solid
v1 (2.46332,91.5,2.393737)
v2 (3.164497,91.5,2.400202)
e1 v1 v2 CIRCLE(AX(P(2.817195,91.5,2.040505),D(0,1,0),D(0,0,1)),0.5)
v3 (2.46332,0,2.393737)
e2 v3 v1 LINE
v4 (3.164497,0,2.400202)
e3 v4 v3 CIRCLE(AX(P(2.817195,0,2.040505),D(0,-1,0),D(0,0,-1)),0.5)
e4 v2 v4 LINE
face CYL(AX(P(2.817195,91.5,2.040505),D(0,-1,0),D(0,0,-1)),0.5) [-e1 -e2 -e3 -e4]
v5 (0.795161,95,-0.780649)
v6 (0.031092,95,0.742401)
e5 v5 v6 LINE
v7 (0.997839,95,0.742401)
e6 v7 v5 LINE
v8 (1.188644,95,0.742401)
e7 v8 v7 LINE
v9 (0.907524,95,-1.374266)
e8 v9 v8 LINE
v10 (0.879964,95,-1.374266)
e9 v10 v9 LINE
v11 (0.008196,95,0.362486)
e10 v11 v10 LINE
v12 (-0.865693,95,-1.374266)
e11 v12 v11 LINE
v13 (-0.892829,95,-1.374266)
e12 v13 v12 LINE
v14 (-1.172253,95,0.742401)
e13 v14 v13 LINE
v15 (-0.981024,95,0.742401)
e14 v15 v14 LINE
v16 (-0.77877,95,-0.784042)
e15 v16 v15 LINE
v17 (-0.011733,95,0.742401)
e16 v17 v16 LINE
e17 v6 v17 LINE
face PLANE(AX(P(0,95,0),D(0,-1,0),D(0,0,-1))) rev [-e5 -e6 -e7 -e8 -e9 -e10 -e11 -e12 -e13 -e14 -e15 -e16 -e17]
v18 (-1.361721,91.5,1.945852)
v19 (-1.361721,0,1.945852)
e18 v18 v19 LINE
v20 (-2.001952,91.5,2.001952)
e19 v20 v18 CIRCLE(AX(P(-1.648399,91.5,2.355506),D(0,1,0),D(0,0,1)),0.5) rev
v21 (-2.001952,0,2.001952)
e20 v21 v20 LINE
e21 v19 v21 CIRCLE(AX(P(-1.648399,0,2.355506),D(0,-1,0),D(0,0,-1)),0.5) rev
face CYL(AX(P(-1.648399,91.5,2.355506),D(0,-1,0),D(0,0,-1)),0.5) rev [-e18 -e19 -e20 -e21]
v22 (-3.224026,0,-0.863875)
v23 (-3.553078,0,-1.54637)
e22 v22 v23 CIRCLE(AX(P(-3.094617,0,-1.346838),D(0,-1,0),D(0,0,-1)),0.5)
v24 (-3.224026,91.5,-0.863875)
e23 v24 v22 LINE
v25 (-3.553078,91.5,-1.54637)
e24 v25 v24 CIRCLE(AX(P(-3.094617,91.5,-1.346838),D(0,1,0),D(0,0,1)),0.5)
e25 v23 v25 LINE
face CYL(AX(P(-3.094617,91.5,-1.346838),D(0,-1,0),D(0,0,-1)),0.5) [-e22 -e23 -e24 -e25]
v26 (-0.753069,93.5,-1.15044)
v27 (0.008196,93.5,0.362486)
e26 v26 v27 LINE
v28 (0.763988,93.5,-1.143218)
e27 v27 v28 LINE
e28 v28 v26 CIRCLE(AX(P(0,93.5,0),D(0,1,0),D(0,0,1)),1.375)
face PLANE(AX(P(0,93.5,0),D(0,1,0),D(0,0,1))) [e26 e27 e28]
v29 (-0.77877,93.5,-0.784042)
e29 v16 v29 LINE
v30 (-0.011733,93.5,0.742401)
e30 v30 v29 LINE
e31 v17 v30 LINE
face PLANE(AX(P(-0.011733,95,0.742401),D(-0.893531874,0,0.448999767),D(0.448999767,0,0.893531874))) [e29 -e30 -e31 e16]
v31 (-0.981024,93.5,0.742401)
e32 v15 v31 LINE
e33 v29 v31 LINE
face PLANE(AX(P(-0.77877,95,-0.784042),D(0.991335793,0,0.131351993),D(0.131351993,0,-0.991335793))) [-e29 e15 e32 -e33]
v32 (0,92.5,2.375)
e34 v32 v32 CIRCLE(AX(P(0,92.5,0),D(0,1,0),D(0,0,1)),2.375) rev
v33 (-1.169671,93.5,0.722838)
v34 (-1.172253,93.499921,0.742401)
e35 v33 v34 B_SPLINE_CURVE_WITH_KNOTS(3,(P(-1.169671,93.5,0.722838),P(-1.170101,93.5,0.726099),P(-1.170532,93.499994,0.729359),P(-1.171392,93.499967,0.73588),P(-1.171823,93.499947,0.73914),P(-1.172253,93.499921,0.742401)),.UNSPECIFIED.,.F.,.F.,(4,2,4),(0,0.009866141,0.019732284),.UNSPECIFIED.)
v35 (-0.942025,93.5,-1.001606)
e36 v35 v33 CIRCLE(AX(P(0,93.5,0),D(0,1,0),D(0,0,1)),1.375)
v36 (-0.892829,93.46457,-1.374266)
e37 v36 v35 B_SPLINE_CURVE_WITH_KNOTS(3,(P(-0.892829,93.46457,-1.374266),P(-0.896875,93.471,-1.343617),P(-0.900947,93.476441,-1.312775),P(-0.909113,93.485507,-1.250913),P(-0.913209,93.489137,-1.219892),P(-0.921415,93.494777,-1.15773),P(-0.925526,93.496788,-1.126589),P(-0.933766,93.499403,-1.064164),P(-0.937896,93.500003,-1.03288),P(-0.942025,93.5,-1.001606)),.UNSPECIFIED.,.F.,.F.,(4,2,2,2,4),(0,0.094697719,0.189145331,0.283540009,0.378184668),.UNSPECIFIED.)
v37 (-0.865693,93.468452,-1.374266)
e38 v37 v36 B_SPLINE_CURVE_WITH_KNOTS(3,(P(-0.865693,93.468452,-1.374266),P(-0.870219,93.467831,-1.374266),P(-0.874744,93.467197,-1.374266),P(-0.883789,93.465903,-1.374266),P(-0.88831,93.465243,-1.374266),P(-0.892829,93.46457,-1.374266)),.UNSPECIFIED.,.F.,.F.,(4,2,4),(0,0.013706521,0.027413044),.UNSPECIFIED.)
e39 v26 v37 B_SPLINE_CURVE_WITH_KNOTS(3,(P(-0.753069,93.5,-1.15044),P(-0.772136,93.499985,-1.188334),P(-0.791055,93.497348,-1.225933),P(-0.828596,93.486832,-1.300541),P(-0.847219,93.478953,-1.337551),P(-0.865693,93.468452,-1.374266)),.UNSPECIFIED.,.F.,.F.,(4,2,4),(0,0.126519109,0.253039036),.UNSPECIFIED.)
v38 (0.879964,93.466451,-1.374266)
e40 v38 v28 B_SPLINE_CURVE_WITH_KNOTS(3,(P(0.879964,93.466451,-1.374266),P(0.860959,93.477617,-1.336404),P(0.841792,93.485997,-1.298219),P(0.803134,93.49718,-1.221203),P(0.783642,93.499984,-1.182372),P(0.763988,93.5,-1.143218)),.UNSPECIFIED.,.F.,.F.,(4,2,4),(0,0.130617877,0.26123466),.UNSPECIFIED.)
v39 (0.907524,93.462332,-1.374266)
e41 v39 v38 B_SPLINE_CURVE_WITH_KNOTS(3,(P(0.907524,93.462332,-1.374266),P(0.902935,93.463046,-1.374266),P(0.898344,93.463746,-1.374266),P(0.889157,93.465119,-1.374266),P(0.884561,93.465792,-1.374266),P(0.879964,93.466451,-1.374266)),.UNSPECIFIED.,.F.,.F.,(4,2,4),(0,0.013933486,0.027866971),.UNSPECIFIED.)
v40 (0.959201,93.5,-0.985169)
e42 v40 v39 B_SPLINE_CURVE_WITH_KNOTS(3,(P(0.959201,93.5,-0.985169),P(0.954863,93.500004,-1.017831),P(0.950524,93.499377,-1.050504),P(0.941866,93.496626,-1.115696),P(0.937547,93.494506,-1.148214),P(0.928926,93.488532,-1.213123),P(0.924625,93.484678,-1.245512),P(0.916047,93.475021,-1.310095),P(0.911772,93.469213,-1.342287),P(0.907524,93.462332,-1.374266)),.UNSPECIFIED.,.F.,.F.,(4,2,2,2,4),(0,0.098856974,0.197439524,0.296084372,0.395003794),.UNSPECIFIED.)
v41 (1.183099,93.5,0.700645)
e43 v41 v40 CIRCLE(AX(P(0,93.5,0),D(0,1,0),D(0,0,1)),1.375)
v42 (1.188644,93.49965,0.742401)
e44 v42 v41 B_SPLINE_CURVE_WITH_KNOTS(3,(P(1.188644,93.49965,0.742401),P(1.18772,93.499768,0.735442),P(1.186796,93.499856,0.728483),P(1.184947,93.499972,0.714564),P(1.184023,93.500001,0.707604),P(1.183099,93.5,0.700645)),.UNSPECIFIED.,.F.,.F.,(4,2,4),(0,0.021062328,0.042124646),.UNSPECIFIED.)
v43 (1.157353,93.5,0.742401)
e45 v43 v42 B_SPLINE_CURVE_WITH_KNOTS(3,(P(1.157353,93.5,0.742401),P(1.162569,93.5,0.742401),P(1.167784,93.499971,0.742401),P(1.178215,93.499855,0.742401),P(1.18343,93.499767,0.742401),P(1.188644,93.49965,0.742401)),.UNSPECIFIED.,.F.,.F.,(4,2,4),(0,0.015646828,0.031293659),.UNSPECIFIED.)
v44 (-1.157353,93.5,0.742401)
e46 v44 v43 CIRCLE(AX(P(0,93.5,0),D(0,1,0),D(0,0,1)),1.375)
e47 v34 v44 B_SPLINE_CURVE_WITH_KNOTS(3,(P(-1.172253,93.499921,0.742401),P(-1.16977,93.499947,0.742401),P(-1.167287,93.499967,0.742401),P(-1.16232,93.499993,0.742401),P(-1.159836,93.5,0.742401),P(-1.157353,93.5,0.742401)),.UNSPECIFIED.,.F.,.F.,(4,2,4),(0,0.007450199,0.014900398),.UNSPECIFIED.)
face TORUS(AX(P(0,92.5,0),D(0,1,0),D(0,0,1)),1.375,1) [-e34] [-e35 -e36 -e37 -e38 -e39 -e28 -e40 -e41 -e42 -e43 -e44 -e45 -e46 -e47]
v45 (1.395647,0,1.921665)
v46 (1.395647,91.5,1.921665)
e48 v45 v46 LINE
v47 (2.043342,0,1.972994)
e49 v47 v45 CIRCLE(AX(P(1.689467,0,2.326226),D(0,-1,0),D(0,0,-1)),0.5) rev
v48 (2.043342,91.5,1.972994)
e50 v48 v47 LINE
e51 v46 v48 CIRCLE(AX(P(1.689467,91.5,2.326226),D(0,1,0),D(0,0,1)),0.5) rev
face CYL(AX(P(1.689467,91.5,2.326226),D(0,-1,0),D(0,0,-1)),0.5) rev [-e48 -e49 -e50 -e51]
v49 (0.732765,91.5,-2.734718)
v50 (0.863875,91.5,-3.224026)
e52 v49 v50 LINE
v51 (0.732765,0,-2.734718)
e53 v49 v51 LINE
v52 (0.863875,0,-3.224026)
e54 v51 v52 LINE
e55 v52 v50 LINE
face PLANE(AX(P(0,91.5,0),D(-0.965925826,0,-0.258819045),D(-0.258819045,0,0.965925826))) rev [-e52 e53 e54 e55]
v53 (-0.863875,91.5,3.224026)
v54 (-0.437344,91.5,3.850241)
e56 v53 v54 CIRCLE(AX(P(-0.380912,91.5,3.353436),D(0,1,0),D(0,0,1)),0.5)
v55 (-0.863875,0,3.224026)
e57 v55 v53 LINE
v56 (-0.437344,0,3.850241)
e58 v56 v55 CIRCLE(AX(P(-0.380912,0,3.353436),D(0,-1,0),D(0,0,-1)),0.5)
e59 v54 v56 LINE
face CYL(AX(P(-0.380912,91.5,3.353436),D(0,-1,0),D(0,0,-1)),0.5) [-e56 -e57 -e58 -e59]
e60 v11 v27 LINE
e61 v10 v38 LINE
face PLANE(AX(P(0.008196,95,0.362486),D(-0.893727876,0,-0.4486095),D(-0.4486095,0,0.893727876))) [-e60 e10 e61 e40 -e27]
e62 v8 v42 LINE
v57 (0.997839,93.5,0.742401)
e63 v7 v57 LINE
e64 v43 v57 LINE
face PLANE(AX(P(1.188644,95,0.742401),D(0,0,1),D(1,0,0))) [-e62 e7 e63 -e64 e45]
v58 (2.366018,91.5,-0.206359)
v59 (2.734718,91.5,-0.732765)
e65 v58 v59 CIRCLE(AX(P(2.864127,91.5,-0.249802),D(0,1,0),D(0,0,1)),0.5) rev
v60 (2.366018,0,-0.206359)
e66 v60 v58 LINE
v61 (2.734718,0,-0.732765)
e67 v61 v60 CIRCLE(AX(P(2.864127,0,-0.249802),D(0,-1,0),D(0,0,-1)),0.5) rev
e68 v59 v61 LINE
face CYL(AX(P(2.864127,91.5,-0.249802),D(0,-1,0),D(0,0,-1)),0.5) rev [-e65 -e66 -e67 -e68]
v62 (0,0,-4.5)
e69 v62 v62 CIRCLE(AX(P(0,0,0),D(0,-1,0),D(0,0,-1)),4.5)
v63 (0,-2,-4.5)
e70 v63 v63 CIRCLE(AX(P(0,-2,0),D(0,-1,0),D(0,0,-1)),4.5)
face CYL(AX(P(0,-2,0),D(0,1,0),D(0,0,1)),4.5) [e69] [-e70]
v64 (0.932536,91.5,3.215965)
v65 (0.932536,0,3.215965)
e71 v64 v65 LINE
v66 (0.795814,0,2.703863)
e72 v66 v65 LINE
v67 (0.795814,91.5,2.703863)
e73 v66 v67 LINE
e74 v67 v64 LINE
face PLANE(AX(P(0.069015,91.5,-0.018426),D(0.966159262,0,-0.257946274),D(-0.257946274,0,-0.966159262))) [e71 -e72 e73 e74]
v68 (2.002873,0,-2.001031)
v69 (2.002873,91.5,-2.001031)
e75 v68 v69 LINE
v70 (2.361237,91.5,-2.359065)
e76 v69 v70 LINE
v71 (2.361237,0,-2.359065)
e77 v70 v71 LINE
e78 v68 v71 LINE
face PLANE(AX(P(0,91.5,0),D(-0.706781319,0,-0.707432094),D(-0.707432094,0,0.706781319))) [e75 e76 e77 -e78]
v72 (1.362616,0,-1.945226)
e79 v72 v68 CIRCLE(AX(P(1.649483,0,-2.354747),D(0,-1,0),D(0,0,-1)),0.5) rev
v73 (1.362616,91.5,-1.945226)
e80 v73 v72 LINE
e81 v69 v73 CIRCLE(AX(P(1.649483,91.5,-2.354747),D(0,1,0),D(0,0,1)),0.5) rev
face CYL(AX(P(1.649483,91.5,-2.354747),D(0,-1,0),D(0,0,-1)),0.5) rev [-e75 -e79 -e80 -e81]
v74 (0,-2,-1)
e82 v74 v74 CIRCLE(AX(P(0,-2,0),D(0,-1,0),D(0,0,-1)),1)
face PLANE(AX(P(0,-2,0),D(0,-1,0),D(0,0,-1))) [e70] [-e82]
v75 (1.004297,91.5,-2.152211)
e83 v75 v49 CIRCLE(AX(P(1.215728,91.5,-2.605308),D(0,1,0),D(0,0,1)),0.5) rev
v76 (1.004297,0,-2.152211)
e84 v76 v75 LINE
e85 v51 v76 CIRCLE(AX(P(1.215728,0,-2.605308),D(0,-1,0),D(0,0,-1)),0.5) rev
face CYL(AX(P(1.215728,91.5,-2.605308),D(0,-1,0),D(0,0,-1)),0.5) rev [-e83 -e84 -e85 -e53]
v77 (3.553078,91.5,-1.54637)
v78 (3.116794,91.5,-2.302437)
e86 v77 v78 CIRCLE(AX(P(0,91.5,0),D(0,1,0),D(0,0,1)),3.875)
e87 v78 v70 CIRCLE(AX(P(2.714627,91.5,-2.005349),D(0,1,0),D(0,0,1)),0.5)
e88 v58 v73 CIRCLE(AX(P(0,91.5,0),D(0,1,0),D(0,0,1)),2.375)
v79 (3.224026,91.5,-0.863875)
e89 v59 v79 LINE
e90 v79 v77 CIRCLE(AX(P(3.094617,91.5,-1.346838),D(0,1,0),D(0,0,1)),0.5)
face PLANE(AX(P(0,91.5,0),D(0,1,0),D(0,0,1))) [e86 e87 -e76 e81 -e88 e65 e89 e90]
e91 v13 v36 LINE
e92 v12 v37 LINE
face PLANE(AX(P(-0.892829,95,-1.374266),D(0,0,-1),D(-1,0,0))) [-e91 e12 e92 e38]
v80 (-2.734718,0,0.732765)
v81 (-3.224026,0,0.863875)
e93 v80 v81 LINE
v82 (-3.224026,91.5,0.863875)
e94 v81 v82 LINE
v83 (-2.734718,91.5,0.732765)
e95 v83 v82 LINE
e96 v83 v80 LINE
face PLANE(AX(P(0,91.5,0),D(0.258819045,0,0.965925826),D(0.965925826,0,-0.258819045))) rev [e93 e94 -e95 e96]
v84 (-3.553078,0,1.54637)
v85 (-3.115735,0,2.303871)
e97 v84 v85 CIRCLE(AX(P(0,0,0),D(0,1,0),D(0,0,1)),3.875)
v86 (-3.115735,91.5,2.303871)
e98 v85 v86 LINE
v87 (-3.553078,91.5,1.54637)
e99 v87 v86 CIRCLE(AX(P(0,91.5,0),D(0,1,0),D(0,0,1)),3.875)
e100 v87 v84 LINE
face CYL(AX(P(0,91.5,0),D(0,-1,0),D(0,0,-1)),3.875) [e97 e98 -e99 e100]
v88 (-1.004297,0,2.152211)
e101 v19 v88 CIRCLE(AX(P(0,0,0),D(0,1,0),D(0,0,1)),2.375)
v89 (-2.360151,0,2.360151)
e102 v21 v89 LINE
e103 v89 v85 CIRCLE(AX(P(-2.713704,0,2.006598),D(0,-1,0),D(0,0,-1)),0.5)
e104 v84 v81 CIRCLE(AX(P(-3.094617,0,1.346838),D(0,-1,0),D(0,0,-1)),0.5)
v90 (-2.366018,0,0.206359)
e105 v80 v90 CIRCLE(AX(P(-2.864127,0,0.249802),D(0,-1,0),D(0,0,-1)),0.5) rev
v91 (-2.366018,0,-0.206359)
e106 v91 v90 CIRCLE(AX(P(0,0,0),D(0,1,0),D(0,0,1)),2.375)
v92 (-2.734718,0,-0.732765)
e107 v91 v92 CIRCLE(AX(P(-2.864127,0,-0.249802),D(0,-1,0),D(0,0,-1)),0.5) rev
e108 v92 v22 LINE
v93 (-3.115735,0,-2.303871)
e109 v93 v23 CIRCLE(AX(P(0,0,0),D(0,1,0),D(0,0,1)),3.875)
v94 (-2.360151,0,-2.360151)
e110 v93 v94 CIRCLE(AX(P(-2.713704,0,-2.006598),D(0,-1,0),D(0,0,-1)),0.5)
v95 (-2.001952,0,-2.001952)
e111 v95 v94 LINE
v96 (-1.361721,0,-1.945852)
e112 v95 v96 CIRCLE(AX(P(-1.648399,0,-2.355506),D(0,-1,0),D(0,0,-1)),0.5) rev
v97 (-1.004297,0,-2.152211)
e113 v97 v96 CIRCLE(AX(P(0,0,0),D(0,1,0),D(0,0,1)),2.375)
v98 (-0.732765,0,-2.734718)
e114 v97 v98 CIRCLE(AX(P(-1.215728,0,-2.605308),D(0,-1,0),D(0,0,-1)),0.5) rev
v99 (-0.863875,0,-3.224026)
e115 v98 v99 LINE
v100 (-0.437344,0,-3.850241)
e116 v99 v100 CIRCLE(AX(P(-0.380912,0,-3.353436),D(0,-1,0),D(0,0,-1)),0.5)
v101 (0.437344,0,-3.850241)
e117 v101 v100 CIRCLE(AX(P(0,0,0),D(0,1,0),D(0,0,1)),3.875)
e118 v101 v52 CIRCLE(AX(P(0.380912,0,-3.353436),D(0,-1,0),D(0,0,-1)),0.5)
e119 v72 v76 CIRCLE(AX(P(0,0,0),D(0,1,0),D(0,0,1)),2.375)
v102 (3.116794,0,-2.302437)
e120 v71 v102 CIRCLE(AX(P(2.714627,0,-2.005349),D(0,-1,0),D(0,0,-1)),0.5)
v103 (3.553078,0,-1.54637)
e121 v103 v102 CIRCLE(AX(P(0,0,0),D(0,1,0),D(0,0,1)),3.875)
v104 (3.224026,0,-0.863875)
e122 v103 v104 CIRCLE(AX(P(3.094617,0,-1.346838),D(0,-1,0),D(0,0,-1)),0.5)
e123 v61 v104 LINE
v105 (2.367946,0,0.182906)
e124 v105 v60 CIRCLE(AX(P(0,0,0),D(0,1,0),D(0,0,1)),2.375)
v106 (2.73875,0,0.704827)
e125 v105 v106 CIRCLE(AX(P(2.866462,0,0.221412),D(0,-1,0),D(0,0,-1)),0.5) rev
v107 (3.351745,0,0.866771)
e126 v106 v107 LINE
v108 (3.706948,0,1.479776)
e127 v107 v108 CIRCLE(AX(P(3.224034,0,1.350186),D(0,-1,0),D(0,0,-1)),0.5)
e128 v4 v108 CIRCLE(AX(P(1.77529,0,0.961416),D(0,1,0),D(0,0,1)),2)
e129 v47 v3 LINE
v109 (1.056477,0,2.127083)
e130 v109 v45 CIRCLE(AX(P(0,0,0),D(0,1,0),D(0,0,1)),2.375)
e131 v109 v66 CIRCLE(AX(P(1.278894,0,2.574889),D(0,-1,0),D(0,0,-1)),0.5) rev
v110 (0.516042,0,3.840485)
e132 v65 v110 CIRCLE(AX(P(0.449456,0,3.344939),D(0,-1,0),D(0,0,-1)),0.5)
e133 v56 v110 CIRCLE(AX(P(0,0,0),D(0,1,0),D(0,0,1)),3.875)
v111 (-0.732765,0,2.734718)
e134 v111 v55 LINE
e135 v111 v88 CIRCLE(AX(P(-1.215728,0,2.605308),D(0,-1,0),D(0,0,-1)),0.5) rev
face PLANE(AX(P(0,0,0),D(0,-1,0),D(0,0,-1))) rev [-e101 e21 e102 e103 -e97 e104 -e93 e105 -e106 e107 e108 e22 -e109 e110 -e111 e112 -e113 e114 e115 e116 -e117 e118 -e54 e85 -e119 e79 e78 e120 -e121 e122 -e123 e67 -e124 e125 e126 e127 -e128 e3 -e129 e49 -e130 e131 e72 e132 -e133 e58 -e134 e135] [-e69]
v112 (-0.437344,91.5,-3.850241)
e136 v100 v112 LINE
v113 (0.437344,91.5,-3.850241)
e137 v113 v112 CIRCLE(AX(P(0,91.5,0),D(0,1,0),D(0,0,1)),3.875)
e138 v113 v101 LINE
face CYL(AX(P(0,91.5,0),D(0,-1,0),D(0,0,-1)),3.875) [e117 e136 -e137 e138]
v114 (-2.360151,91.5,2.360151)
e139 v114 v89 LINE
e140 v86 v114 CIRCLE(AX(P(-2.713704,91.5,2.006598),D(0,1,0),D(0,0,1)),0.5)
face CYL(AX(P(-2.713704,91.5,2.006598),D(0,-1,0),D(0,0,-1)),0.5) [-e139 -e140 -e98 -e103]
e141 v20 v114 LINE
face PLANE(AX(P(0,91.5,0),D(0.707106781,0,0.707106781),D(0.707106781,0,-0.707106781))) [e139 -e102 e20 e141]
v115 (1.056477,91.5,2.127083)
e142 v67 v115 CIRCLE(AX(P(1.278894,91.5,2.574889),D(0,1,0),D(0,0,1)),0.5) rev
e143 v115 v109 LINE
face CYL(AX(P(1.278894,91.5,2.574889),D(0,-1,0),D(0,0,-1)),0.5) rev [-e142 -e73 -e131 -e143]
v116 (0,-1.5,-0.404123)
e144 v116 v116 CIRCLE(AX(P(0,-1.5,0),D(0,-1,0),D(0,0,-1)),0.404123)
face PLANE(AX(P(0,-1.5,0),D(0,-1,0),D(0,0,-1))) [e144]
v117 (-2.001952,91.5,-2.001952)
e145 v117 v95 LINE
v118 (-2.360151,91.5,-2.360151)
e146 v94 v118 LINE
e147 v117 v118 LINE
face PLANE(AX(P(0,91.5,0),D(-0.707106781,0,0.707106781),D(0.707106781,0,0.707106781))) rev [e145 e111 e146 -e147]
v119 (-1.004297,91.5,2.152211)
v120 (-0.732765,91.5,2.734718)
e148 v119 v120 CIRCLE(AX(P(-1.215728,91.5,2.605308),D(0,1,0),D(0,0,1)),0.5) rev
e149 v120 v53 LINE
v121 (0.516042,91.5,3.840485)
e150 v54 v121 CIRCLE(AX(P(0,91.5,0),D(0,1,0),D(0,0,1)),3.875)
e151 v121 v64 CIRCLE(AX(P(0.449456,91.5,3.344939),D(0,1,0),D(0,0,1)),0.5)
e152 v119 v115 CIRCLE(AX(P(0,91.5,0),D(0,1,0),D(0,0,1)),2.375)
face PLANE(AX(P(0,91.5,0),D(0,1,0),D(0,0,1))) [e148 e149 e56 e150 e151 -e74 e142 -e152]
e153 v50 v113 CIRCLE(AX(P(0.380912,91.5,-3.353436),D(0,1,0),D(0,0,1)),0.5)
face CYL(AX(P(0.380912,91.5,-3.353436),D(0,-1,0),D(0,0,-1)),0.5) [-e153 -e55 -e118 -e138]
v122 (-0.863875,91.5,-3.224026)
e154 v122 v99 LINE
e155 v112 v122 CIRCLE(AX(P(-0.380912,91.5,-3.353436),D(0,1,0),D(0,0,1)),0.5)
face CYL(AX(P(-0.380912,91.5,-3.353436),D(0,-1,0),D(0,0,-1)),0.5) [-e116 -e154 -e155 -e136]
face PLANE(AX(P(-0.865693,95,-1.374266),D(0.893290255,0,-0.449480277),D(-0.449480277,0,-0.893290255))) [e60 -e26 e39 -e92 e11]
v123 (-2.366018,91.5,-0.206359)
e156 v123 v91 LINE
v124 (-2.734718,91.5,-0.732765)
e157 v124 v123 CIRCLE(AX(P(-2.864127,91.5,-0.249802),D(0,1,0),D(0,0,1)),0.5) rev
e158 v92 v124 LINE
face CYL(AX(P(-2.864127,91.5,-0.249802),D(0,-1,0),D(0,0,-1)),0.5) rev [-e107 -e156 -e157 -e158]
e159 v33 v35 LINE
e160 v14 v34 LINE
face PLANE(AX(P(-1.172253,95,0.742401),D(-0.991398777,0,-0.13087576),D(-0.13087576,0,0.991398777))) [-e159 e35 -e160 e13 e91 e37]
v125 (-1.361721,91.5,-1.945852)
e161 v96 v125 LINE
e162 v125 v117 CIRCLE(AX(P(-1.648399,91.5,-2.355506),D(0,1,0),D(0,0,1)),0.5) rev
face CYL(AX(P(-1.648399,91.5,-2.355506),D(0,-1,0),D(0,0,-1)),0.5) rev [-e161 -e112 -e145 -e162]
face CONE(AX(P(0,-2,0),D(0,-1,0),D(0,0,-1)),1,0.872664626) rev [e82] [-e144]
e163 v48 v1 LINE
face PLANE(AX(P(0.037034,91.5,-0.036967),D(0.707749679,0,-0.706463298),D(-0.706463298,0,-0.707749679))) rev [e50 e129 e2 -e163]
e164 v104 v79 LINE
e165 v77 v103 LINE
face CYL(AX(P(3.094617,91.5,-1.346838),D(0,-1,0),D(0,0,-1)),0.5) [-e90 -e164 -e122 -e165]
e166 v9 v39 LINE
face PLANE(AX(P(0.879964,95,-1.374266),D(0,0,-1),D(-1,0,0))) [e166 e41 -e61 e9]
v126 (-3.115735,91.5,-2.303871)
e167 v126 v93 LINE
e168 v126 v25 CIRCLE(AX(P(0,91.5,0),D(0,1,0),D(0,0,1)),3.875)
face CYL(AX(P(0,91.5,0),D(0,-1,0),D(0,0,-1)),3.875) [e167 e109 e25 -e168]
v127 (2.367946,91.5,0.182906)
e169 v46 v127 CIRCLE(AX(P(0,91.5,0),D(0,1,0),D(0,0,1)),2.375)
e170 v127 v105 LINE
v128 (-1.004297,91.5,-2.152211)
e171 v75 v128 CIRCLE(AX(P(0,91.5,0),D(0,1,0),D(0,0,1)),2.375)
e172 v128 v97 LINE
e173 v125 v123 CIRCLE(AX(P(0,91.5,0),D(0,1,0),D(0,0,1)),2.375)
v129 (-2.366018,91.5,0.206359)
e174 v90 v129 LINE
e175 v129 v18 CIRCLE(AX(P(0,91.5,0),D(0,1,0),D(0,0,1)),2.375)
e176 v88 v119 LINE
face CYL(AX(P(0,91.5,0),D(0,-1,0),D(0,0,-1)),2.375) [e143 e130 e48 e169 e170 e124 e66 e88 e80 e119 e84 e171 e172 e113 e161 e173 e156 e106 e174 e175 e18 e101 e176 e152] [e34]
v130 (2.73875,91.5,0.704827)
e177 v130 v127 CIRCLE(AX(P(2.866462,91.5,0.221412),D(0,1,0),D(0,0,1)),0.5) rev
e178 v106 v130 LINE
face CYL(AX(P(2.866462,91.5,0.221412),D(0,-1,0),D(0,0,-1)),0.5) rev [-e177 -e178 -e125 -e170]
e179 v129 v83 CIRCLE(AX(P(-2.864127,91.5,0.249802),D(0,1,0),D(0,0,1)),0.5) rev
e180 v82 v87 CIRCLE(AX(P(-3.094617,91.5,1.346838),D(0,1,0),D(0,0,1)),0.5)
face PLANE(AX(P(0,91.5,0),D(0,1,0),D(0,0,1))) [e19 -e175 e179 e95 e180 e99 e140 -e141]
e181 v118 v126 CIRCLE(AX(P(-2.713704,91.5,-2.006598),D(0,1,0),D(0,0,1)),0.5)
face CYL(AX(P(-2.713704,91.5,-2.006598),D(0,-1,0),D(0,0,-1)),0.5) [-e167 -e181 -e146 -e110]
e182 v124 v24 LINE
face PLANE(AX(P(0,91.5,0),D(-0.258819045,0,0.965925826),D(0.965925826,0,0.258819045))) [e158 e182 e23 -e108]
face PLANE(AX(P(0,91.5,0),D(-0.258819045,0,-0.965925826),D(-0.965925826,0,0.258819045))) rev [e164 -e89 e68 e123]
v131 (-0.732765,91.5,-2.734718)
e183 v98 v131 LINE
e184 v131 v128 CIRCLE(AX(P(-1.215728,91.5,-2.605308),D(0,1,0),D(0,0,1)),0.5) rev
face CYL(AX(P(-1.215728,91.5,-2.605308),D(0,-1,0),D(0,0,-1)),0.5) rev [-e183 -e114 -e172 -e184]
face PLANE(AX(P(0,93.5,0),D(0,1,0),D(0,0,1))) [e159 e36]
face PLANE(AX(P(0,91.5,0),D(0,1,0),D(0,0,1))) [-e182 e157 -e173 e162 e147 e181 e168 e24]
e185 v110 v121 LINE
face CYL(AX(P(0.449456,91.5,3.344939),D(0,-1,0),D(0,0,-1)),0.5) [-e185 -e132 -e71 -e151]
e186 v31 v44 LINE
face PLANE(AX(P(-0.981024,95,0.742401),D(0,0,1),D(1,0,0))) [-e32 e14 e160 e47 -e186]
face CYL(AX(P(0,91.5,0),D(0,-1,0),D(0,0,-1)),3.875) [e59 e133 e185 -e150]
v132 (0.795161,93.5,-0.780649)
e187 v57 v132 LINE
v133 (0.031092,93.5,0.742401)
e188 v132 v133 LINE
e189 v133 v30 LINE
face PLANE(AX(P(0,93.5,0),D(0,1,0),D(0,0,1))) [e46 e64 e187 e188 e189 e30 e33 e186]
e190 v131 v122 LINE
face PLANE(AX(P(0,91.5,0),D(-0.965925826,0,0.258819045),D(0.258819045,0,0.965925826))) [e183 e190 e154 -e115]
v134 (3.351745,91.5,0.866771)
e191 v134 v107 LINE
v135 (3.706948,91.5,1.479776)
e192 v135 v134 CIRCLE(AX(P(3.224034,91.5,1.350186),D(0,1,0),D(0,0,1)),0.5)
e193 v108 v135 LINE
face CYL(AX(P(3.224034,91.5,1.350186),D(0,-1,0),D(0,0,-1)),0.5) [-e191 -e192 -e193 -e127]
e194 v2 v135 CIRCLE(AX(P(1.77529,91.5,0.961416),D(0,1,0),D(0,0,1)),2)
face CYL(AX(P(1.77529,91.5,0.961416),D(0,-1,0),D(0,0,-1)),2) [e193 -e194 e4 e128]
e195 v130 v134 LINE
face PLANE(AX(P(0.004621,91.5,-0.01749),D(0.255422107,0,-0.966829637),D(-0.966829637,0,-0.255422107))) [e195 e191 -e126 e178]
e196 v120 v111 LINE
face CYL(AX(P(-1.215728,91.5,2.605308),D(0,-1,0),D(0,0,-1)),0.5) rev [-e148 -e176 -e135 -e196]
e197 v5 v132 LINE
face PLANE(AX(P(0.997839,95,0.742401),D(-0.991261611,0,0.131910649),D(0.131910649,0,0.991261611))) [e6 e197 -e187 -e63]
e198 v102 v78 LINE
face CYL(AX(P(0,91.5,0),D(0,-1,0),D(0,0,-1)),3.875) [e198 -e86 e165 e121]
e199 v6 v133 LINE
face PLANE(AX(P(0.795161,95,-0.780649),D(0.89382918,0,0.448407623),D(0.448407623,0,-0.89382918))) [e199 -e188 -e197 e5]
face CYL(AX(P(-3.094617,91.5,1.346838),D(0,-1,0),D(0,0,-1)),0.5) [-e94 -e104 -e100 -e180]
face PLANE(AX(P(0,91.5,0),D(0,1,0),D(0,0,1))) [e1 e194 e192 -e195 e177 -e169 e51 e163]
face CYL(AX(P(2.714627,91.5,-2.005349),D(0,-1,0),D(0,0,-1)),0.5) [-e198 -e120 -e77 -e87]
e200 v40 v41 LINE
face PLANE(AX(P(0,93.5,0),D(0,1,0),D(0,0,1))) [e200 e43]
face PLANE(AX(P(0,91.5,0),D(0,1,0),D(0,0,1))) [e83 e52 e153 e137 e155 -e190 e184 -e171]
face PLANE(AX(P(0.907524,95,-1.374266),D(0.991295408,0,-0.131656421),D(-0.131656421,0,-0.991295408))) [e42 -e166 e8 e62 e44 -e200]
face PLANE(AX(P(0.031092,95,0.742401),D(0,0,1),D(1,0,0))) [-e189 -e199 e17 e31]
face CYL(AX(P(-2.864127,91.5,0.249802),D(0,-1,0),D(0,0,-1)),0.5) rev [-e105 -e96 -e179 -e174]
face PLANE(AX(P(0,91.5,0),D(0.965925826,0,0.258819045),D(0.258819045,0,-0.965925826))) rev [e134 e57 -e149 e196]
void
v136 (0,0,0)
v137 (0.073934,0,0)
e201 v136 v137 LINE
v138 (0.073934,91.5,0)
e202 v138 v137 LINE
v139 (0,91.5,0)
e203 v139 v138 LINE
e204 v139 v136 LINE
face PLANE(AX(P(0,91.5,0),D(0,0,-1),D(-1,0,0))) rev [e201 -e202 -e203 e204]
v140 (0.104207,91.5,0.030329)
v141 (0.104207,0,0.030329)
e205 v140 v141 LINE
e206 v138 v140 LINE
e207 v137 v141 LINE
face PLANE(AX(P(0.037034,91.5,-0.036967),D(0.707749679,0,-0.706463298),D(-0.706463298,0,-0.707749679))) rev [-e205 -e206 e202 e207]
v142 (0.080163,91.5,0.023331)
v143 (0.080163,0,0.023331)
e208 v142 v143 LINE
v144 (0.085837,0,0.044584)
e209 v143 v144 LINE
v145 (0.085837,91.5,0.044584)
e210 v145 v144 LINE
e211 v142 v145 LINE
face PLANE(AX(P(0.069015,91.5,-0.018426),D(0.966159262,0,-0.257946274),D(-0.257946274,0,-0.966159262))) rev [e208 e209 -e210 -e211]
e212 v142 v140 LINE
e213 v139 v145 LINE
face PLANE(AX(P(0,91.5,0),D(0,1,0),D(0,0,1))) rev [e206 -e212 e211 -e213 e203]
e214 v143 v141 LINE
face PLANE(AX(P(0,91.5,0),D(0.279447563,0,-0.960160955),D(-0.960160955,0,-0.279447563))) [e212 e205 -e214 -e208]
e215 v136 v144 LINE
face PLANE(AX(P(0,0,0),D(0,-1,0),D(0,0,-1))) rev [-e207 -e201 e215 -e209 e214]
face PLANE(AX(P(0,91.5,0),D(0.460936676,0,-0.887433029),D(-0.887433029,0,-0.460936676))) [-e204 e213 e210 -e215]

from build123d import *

# Parameters (mm, degrees)
BOSS_EXTRUDE1_DEPTH = 91.5
SKETCH3_R           = 4.5
BOSS_EXTRUDE2_DEPTH = 2
SKETCH4_R           = 2.375
BOSS_EXTRUDE3_DEPTH = 2
FILLET1_R           = 0.5
SKETCH6_R           = 1
CUT_EXTRUDE4_DEPTH  = 0.5
CUT_EXTRUDE4_DRAFT  = -50
BOSS_EXTRUDE4_DEPTH = 1.5
FILLET2_R           = 1


with BuildPart() as part:
    # Sketch2 → Boss-Extrude1 (new body)
    with BuildSketch(Plane(origin=(0, 0, 0), x_dir=(1, 0, 0), z_dir=(0, 1, 0))):
        with BuildLine():
            Line((3.775215965, -0.978645895), (2.300774305, -0.58912019))
            ThreePointArc((2.300774305, -0.58912019), (2.374963211, 0.013219106), (2.294073837, 0.614695232))
            Line((2.294073837, 0.614695232), (3.742962577, 1.0029238))
            ThreePointArc((3.742962577, 1.0029238), (3.356294138, 1.936727823), (2.741299364, 2.73877761))
            Line((2.741299364, 2.73877761), (1.680151223, 1.678605632))
            ThreePointArc((1.680151223, 1.678605632), (1.187973207, 2.056537055), (0.614695232, 2.294073837))
            Line((0.614695232, 2.294073837), (1.0029238, 3.742962577))
            ThreePointArc((1.0029238, 3.742962577), (0, 3.875), (-1.0029238, 3.742962577))
            Line((-1.0029238, 3.742962577), (-0.614695232, 2.294073837))
            ThreePointArc((-0.614695232, 2.294073837), (-1.1875, 2.056810334), (-1.679378605, 1.679378605))
            Line((-1.679378605, 1.679378605), (-2.740038777, 2.740038777))
            ThreePointArc((-2.740038777, 2.740038777), (-3.35584844, 1.9375), (-3.742962577, 1.0029238))
            Line((-3.742962577, 1.0029238), (-2.294073837, 0.614695232))
            ThreePointArc((-2.294073837, 0.614695232), (-2.375, 0), (-2.294073837, -0.614695232))
            Line((-2.294073837, -0.614695232), (-3.742962577, -1.0029238))
            ThreePointArc((-3.742962577, -1.0029238), (-3.35584844, -1.9375), (-2.740038777, -2.740038777))
            Line((-2.740038777, -2.740038777), (-1.679378605, -1.679378605))
            ThreePointArc((-1.679378605, -1.679378605), (-1.1875, -2.056810334), (-0.614695232, -2.294073837))
            Line((-0.614695232, -2.294073837), (-1.0029238, -3.742962577))
            ThreePointArc((-1.0029238, -3.742962577), (0.033967076, -3.874851125), (1.068386506, -3.724805401))
            Line((1.068386506, -3.724805401), (0.681359786, -2.275164575))
            ThreePointArc((0.681359786, -2.275164575), (1.238849907, -2.026296106), (1.714477211, -1.643530618))
            Line((1.714477211, -1.643530618), (2.767163136, -2.698133353))
            ThreePointArc((2.767163136, -2.698133353), (3.500652231, -1.972912562), (3.775215965, -0.978645895))
        make_face()
        Polygon((0.085836926, -0.044584082), (0, 0), (0.073933818, 0), (0.104207494, -0.030328801), (0.080162685, -0.023330742), align=None, mode=Mode.SUBTRACT)
    extrude(amount=BOSS_EXTRUDE1_DEPTH)

    # Sketch3 → Boss-Extrude2 (add)
    with BuildSketch(Plane.XZ):
        with Locations(Location((0, 0, 0), (0, 0, 270))):
            Circle(SKETCH3_R)
    extrude(amount=BOSS_EXTRUDE2_DEPTH)

    # Sketch4 → Boss-Extrude3 (add)
    with BuildSketch(Plane(origin=(0, 91.5, 0), x_dir=(1, 0, 0), z_dir=(0, 1, 0))):
        with Locations(Location((0, 0, 0), (0, 0, 75))):
            Circle(SKETCH4_R)
    extrude(amount=BOSS_EXTRUDE3_DEPTH)

    # Fillet1
    # the kernel refuses this fillet: 0.5 mm, written as the material it adds along each edge
    with BuildSketch(Plane(origin=(-2.294073837, -1.140469783, 0.614695232), x_dir=(-0.965925826289068, 0, 0.2588190451025218), z_dir=(0, 1, 0)), Plane(origin=(-1.679378605, -1.140469783, -1.679378605), x_dir=(-0.7071067811865478, 0, -0.7071067811865474), z_dir=(0, 1, 0)), Plane(origin=(0.614695232, -1.140469783, -2.294073837), x_dir=(0.2588190451025215, 0, -0.9659258262890681), z_dir=(0, 1, 0)), Plane(origin=(2.294073837, -1.140469783, -0.614695232), x_dir=(0.9659258262890681, 0, -0.2588190451025215), z_dir=(0, 1, 0)), Plane(origin=(-0.614695232, -1.140469783, 2.294073837), x_dir=(-0.2588190451025215, 0, 0.9659258262890681), z_dir=(0, 1, 0))) as fillet1_piece_1:
        with BuildLine():
            CenterArc((0.456187913, -0.5), FILLET1_R, 90, 79.984589832)
            ThreePointArc((-0.036192593, -0.413043478), (-0.00906545, -0.20731306), (0, 0))
            Line((0, 0), (0.456187913, 0))
        make_face()
    extrude(amount=92.640469783)
    with BuildSketch(Plane(origin=(-2.294073837, -1.140469783, -0.614695232), x_dir=(-0.17351574004952178, 0, 0.9848310961556133), z_dir=(0, 1, 0)), Plane(origin=(-1.679378605, -1.140469783, 1.679378605), x_dir=(0.7661308776828862, 0, 0.6426845869171364), z_dir=(0, 1, 0))) as fillet1_piece_2:
        with BuildLine():
            CenterArc((0.458270974, -0.498091484), FILLET1_R, 95.007705084, 79.984589832)
            Line((-0.03982051, -0.45444663), (0, 0))
            ThreePointArc((0, 0), (0.20731306, -0.00906545), (0.414626119, 0))
        make_face()
    extrude(amount=92.640469783)
    with BuildSketch(Plane(origin=(-0.614695232, -1.140469783, -2.294073837), x_dir=(-0.258819045102522, 0, -0.965925826289068), z_dir=(0, 1, 0)), Plane(origin=(1.680151223, -1.140469783, -1.678605632), x_dir=(0.707432093873984, 0, -0.7067813187663288), z_dir=(0, 1, 0))) as fillet1_piece_3:
        with BuildLine():
            CenterArc((0.456187913, 0.5), FILLET1_R, 190.015410168, 79.984589832)
            ThreePointArc((-0.036192593, 0.413043478), (-0.00906545, 0.20731306), (0, 0))
            Line((0, 0), (0.456187913, 0))
        make_face()
    extrude(amount=92.640469783)
    with BuildSketch(Plane(origin=(2.300774305, -1.132506036, 0.58912019), x_dir=(0.16314582309469597, 0, -0.9866019665532569), z_dir=(0, 1, 0))) as fillet1_piece_4:
        with BuildLine():
            CenterArc((0.455070929, -0.498118095), FILLET1_R, 94.972648578, 79.61829146)
            Line((-0.042702606, -0.450985227), (0, 0))
            ThreePointArc((0, 0), (0.20586542, -0.008939048), (0.411730841, 0))
        make_face()
    extrude(amount=92.632506036)
    with BuildSketch(Plane(origin=(1.714477211, -1.163771178, 1.643530618), x_dir=(0.7064632978713467, 0, 0.7077496794494088), z_dir=(0, 1, 0))) as fillet1_piece_5:
        with BuildLine():
            CenterArc((0.465508471, -0.5), FILLET1_R, 90, 81.041880237)
            ThreePointArc((-0.02839274, -0.422143763), (-0.00477723, -0.211705398), (0, 0))
            Line((0, 0), (0.465508471, 0))
        make_face()
    extrude(amount=92.663771178)
    with BuildSketch(Plane(origin=(0.681359786, -1.109284133, 2.275164575), x_dir=(0.9301474254657973, 0, -0.3671862836481626), z_dir=(0, 1, 0))) as fillet1_piece_6:
        with BuildLine():
            CenterArc((0.445739753, -0.498194619), FILLET1_R, 94.870436099, 78.535607624)
            Line((-0.050952689, -0.440778436), (0, 0))
            ThreePointArc((0, 0), (0.201644174, -0.008575561), (0.403288348, 0))
        make_face()
    extrude(amount=92.609284133)
    # the kernel refuses this fillet: 0.5 mm, written as the material it takes off along each edge
    with BuildSketch(Plane(origin=(-2.740038777, 0, 2.740038777), x_dir=(-0.6526300069150477, 0, -0.7576767609436524), z_dir=(0, 1, 0)), Plane(origin=(-3.742962577, 0, -1.0029238), x_dir=(0.32985231937679765, 0, -0.9440325457322681), z_dir=(0, 1, 0)), Plane(origin=(-1.0029238, 0, -3.742962577), x_dir=(0.982482326291838, 0, -0.18635578478860887), z_dir=(0, 1, 0)), Plane(origin=(2.741299364, 0, -2.73877761), x_dir=(0.6522812796019254, 0, 0.7579769998363239), z_dir=(0, 1, 0))) as fillet1_2_piece_1:
        with BuildLine():
            CenterArc((0.538524723, -0.49861874), FILLET1_R, 85.740187873, 98.519624254)
            Line((0.039905983, -0.535758376), (0, 0))
            ThreePointArc((0, 0), (0.287832179, 0.010704768), (0.575664359, 0))
        make_face()
    extrude(amount=92.939160897, mode=Mode.SUBTRACT)
    with BuildSketch(Plane(origin=(-3.742962577, 0, 1.0029238), x_dir=(0.9659258262890679, 0, -0.2588190451025218), z_dir=(0, 1, 0)), Plane(origin=(-2.740038777, 0, -2.740038777), x_dir=(0.7071067811865476, 0, 0.7071067811865476), z_dir=(0, 1, 0)), Plane(origin=(1.0029238, 0, -3.742962577), x_dir=(-0.25881904510252196, 0, 0.965925826289068), z_dir=(0, 1, 0)), Plane(origin=(3.742962577, 0, -1.0029238), x_dir=(-0.9659258262890681, 0, 0.25881904510252185), z_dir=(0, 1, 0)), Plane(origin=(-1.0029238, 0, 3.742962577), x_dir=(0.2588190451025216, 0, -0.9659258262890681), z_dir=(0, 1, 0))) as fillet1_2_piece_2:
        with BuildLine():
            CenterArc((0.537242519, -0.5), FILLET1_R, 90, 98.519624254)
            ThreePointArc((0.04275993, -0.574074074), (0.010704768, -0.287832179), (0, 0))
            Line((0, 0), (0.537242519, 0))
        make_face()
    extrude(amount=92.939160897, mode=Mode.SUBTRACT)
    with BuildSketch(Plane(origin=(3.775215965, 0, 0.978645895), x_dir=(-0.13498089829276533, 0, 0.9908482008340522), z_dir=(0, 1, 0))) as fillet1_2_piece_3:
        with BuildLine():
            CenterArc((0.442538799, -0.49598715), FILLET1_R, 82.736098253, 90.22281865)
            Line((-0.053690457, -0.434696649), (0, 0))
            ThreePointArc((0, 0), (0.252879314, 0.016051399), (0.505758627, 0))
        make_face()
    extrude(amount=92.764396568, mode=Mode.SUBTRACT)
    with BuildSketch(Plane(origin=(2.767163136, 0, 2.698133353), x_dir=(0.8000663385432955, 0, -0.5999115384203949), z_dir=(0, 1, 0))) as fillet1_2_piece_4:
        with BuildLine():
            CenterArc((0.434547354, 0.496131331), FILLET1_R, 188.084320914, 89.047719887)
            Line((-0.060483736, 0.425816179), (0, 0))
            ThreePointArc((0, 0), (0.248312773, -0.015474675), (0.496625547, 0))
        make_face()
    extrude(amount=92.741563867, mode=Mode.SUBTRACT)
    with BuildSketch(Plane(origin=(1.068386506, 0, 3.724805401), x_dir=(-0.9787647804449897, 0, 0.20498659605074468), z_dir=(0, 1, 0))) as fillet1_2_piece_5:
        with BuildLine():
            CenterArc((0.527919562, -0.498672678), FILLET1_R, 85.824226653, 97.295295094)
            Line((0.028660468, -0.525882193), (0, 0))
            ThreePointArc((0, 0), (0.282163904, 0.010286747), (0.564327807, 0))
        make_face()
    extrude(amount=92.910819518, mode=Mode.SUBTRACT)


with BuildPart() as cut_extrude4_tool:
    # Sketch6 → Cut-Extrude4 (with draft: the straight prism first)
    with BuildSketch(Plane.XZ.offset(2)):
        Circle(SKETCH6_R)
    extrude(amount=-CUT_EXTRUDE4_DEPTH)
    # Cut-Extrude4: the draft: its side faces are tilted about the plane it starts from
    cut_extrude4_sides = [cut_extrude4_tool.faces().sort_by_distance(p)[0] for p in [
        (-1, -1.75, 0),
    ]]
    draft(cut_extrude4_sides, Plane.XZ.offset(2), CUT_EXTRUDE4_DRAFT)


with BuildPart() as part_1:
    add(part.part)

    # Cut-Extrude4: cut by cut_extrude4_tool
    add(cut_extrude4_tool.part, mode=Mode.SUBTRACT)

    # Sketch5 → Boss-Extrude4 (add)
    with BuildSketch(Plane(origin=(0, 93.5, 0), x_dir=(1, 0, 0), z_dir=(0, 1, 0))):
        Polygon((-1.172253179, -0.742400791), (-0.892829434, 1.374265875), (-0.865692682, 1.374265875), (0.008195539, -0.362486261), (0.879963701, 1.374265875), (0.907524465, 1.374265875), (1.188644257, -0.742400791), (0.997838968, -0.742400791), (0.795161351, 0.780649422), (0.031092174, -0.742400791), (-0.011733013, -0.742400791), (-0.778770273, 0.784041516), (-0.981023879, -0.742400791), align=None)
    extrude(amount=BOSS_EXTRUDE4_DEPTH)

    # Fillet2
    # the kernel refuses this fillet: 1 mm, written as the material it takes off along each edge
    with BuildSketch(Plane(origin=(0, 93.5, 0), x_dir=(0.25881904510252074, 0, -0.9659258262890682), z_dir=(0.9659258262890682, 0, 0.25881904510252074))) as fillet2_piece_1_section:
        with BuildLine():
            CenterArc((2.375 - FILLET2_R, -FILLET2_R), FILLET2_R, 0, 90)
            Line((2.375 - FILLET2_R, 0), (2.375, 0))
            Line((2.375, 0), (2.375, -FILLET2_R))
        make_face()
    fillet2_piece_1 = revolve(axis=Axis((0, 93.5, 0), (0, 1, 0)), mode=Mode.PRIVATE)
    fillet2_piece_1 = split(fillet2_piece_1, bisect_by=Plane(origin=(0.991336006, 93.280732894, -1.596143773), z_dir=(-0.8937278759727254, 0, -0.44860950024412194)), keep=Keep.TOP, mode=Mode.PRIVATE)
    fillet2_piece_1 = split(fillet2_piece_1, bisect_by=Plane(origin=(-0.976518379, 93.280732894, -1.594519178), z_dir=(0.8932902553120649, 0, -0.44948027739213037)), keep=Keep.TOP, mode=Mode.PRIVATE)
    add(fillet2_piece_1, mode=Mode.SUBTRACT)
    with BuildSketch(Plane(origin=(0, 93.5, 0), x_dir=(0.25881904510252074, 0, -0.9659258262890682), z_dir=(0.9659258262890682, 0, 0.25881904510252074))) as fillet2_piece_2_section:
        with BuildLine():
            CenterArc((2.375 - FILLET2_R, -FILLET2_R), FILLET2_R, 0, 90)
            Line((2.375 - FILLET2_R, 0), (2.375, 0))
            Line((2.375, 0), (2.375, -FILLET2_R))
        make_face()
    fillet2_piece_2 = revolve(axis=Axis((0, 93.5, 0), (0, 1, 0)), mode=Mode.PRIVATE)
    fillet2_piece_2 = split(fillet2_piece_2, bisect_by=Plane(origin=(-0.882160768, 93.481308127, -1.374265875), z_dir=(0, 0, -1)), keep=Keep.TOP, mode=Mode.PRIVATE)
    add(fillet2_piece_2, mode=Mode.SUBTRACT)
    with BuildSketch(Plane(origin=(0, 93.5, 0), x_dir=(0.25881904510252074, 0, -0.9659258262890682), z_dir=(0.9659258262890682, 0, 0.25881904510252074))) as fillet2_piece_3_section:
        with BuildLine():
            CenterArc((2.375 - FILLET2_R, -FILLET2_R), FILLET2_R, 0, 90)
            Line((2.375 - FILLET2_R, 0), (2.375, 0))
            Line((2.375, 0), (2.375, -FILLET2_R))
        make_face()
    fillet2_piece_3 = revolve(axis=Axis((0, 93.5, 0), (0, 1, 0)), mode=Mode.PRIVATE)
    fillet2_piece_3 = split(fillet2_piece_3, bisect_by=Plane(origin=(1.060607469, 93.278124519, -0.221640908), z_dir=(0.9912954083909878, 0, -0.13165642142692804)), keep=Keep.TOP, mode=Mode.PRIVATE)
    add(fillet2_piece_3, mode=Mode.SUBTRACT)
    with BuildSketch(Plane(origin=(0, 93.5, 0), x_dir=(0.25881904510252074, 0, -0.9659258262890682), z_dir=(0.9659258262890682, 0, 0.25881904510252074))) as fillet2_piece_4_section:
        with BuildLine():
            CenterArc((2.375 - FILLET2_R, -FILLET2_R), FILLET2_R, 0, 90)
            Line((2.375 - FILLET2_R, 0), (2.375, 0))
            Line((2.375, 0), (2.375, -FILLET2_R))
        make_face()
    fillet2_piece_4 = revolve(axis=Axis((0, 93.5, 0), (0, 1, 0)), mode=Mode.PRIVATE)
    fillet2_piece_4 = split(fillet2_piece_4, bisect_by=Plane(origin=(-1.045137857, 93.278152838, -0.220512241), z_dir=(-0.9913987771987147, 0, -0.13087576005087198)), keep=Keep.TOP, mode=Mode.PRIVATE)
    add(fillet2_piece_4, mode=Mode.SUBTRACT)
    with BuildSketch(Plane(origin=(0, 93.5, 0), x_dir=(0.25881904510252074, 0, -0.9659258262890682), z_dir=(0.9659258262890682, 0, 0.25881904510252074))) as fillet2_piece_5_section:
        with BuildLine():
            CenterArc((2.375 - FILLET2_R, -FILLET2_R), FILLET2_R, 0, 90)
            Line((2.375 - FILLET2_R, 0), (2.375, 0))
            Line((2.375, 0), (2.375, -FILLET2_R))
        make_face()
    fillet2_piece_5 = revolve(axis=Axis((0, 93.5, 0), (0, 1, 0)), mode=Mode.PRIVATE)
    fillet2_piece_5 = split(fillet2_piece_5, bisect_by=Plane(origin=(-1.05473696, 93.291045211, 0.742400791), z_dir=(0, 0, 1)), keep=Keep.TOP, mode=Mode.PRIVATE)
    add(fillet2_piece_5, mode=Mode.SUBTRACT)


solid = part_1.part
